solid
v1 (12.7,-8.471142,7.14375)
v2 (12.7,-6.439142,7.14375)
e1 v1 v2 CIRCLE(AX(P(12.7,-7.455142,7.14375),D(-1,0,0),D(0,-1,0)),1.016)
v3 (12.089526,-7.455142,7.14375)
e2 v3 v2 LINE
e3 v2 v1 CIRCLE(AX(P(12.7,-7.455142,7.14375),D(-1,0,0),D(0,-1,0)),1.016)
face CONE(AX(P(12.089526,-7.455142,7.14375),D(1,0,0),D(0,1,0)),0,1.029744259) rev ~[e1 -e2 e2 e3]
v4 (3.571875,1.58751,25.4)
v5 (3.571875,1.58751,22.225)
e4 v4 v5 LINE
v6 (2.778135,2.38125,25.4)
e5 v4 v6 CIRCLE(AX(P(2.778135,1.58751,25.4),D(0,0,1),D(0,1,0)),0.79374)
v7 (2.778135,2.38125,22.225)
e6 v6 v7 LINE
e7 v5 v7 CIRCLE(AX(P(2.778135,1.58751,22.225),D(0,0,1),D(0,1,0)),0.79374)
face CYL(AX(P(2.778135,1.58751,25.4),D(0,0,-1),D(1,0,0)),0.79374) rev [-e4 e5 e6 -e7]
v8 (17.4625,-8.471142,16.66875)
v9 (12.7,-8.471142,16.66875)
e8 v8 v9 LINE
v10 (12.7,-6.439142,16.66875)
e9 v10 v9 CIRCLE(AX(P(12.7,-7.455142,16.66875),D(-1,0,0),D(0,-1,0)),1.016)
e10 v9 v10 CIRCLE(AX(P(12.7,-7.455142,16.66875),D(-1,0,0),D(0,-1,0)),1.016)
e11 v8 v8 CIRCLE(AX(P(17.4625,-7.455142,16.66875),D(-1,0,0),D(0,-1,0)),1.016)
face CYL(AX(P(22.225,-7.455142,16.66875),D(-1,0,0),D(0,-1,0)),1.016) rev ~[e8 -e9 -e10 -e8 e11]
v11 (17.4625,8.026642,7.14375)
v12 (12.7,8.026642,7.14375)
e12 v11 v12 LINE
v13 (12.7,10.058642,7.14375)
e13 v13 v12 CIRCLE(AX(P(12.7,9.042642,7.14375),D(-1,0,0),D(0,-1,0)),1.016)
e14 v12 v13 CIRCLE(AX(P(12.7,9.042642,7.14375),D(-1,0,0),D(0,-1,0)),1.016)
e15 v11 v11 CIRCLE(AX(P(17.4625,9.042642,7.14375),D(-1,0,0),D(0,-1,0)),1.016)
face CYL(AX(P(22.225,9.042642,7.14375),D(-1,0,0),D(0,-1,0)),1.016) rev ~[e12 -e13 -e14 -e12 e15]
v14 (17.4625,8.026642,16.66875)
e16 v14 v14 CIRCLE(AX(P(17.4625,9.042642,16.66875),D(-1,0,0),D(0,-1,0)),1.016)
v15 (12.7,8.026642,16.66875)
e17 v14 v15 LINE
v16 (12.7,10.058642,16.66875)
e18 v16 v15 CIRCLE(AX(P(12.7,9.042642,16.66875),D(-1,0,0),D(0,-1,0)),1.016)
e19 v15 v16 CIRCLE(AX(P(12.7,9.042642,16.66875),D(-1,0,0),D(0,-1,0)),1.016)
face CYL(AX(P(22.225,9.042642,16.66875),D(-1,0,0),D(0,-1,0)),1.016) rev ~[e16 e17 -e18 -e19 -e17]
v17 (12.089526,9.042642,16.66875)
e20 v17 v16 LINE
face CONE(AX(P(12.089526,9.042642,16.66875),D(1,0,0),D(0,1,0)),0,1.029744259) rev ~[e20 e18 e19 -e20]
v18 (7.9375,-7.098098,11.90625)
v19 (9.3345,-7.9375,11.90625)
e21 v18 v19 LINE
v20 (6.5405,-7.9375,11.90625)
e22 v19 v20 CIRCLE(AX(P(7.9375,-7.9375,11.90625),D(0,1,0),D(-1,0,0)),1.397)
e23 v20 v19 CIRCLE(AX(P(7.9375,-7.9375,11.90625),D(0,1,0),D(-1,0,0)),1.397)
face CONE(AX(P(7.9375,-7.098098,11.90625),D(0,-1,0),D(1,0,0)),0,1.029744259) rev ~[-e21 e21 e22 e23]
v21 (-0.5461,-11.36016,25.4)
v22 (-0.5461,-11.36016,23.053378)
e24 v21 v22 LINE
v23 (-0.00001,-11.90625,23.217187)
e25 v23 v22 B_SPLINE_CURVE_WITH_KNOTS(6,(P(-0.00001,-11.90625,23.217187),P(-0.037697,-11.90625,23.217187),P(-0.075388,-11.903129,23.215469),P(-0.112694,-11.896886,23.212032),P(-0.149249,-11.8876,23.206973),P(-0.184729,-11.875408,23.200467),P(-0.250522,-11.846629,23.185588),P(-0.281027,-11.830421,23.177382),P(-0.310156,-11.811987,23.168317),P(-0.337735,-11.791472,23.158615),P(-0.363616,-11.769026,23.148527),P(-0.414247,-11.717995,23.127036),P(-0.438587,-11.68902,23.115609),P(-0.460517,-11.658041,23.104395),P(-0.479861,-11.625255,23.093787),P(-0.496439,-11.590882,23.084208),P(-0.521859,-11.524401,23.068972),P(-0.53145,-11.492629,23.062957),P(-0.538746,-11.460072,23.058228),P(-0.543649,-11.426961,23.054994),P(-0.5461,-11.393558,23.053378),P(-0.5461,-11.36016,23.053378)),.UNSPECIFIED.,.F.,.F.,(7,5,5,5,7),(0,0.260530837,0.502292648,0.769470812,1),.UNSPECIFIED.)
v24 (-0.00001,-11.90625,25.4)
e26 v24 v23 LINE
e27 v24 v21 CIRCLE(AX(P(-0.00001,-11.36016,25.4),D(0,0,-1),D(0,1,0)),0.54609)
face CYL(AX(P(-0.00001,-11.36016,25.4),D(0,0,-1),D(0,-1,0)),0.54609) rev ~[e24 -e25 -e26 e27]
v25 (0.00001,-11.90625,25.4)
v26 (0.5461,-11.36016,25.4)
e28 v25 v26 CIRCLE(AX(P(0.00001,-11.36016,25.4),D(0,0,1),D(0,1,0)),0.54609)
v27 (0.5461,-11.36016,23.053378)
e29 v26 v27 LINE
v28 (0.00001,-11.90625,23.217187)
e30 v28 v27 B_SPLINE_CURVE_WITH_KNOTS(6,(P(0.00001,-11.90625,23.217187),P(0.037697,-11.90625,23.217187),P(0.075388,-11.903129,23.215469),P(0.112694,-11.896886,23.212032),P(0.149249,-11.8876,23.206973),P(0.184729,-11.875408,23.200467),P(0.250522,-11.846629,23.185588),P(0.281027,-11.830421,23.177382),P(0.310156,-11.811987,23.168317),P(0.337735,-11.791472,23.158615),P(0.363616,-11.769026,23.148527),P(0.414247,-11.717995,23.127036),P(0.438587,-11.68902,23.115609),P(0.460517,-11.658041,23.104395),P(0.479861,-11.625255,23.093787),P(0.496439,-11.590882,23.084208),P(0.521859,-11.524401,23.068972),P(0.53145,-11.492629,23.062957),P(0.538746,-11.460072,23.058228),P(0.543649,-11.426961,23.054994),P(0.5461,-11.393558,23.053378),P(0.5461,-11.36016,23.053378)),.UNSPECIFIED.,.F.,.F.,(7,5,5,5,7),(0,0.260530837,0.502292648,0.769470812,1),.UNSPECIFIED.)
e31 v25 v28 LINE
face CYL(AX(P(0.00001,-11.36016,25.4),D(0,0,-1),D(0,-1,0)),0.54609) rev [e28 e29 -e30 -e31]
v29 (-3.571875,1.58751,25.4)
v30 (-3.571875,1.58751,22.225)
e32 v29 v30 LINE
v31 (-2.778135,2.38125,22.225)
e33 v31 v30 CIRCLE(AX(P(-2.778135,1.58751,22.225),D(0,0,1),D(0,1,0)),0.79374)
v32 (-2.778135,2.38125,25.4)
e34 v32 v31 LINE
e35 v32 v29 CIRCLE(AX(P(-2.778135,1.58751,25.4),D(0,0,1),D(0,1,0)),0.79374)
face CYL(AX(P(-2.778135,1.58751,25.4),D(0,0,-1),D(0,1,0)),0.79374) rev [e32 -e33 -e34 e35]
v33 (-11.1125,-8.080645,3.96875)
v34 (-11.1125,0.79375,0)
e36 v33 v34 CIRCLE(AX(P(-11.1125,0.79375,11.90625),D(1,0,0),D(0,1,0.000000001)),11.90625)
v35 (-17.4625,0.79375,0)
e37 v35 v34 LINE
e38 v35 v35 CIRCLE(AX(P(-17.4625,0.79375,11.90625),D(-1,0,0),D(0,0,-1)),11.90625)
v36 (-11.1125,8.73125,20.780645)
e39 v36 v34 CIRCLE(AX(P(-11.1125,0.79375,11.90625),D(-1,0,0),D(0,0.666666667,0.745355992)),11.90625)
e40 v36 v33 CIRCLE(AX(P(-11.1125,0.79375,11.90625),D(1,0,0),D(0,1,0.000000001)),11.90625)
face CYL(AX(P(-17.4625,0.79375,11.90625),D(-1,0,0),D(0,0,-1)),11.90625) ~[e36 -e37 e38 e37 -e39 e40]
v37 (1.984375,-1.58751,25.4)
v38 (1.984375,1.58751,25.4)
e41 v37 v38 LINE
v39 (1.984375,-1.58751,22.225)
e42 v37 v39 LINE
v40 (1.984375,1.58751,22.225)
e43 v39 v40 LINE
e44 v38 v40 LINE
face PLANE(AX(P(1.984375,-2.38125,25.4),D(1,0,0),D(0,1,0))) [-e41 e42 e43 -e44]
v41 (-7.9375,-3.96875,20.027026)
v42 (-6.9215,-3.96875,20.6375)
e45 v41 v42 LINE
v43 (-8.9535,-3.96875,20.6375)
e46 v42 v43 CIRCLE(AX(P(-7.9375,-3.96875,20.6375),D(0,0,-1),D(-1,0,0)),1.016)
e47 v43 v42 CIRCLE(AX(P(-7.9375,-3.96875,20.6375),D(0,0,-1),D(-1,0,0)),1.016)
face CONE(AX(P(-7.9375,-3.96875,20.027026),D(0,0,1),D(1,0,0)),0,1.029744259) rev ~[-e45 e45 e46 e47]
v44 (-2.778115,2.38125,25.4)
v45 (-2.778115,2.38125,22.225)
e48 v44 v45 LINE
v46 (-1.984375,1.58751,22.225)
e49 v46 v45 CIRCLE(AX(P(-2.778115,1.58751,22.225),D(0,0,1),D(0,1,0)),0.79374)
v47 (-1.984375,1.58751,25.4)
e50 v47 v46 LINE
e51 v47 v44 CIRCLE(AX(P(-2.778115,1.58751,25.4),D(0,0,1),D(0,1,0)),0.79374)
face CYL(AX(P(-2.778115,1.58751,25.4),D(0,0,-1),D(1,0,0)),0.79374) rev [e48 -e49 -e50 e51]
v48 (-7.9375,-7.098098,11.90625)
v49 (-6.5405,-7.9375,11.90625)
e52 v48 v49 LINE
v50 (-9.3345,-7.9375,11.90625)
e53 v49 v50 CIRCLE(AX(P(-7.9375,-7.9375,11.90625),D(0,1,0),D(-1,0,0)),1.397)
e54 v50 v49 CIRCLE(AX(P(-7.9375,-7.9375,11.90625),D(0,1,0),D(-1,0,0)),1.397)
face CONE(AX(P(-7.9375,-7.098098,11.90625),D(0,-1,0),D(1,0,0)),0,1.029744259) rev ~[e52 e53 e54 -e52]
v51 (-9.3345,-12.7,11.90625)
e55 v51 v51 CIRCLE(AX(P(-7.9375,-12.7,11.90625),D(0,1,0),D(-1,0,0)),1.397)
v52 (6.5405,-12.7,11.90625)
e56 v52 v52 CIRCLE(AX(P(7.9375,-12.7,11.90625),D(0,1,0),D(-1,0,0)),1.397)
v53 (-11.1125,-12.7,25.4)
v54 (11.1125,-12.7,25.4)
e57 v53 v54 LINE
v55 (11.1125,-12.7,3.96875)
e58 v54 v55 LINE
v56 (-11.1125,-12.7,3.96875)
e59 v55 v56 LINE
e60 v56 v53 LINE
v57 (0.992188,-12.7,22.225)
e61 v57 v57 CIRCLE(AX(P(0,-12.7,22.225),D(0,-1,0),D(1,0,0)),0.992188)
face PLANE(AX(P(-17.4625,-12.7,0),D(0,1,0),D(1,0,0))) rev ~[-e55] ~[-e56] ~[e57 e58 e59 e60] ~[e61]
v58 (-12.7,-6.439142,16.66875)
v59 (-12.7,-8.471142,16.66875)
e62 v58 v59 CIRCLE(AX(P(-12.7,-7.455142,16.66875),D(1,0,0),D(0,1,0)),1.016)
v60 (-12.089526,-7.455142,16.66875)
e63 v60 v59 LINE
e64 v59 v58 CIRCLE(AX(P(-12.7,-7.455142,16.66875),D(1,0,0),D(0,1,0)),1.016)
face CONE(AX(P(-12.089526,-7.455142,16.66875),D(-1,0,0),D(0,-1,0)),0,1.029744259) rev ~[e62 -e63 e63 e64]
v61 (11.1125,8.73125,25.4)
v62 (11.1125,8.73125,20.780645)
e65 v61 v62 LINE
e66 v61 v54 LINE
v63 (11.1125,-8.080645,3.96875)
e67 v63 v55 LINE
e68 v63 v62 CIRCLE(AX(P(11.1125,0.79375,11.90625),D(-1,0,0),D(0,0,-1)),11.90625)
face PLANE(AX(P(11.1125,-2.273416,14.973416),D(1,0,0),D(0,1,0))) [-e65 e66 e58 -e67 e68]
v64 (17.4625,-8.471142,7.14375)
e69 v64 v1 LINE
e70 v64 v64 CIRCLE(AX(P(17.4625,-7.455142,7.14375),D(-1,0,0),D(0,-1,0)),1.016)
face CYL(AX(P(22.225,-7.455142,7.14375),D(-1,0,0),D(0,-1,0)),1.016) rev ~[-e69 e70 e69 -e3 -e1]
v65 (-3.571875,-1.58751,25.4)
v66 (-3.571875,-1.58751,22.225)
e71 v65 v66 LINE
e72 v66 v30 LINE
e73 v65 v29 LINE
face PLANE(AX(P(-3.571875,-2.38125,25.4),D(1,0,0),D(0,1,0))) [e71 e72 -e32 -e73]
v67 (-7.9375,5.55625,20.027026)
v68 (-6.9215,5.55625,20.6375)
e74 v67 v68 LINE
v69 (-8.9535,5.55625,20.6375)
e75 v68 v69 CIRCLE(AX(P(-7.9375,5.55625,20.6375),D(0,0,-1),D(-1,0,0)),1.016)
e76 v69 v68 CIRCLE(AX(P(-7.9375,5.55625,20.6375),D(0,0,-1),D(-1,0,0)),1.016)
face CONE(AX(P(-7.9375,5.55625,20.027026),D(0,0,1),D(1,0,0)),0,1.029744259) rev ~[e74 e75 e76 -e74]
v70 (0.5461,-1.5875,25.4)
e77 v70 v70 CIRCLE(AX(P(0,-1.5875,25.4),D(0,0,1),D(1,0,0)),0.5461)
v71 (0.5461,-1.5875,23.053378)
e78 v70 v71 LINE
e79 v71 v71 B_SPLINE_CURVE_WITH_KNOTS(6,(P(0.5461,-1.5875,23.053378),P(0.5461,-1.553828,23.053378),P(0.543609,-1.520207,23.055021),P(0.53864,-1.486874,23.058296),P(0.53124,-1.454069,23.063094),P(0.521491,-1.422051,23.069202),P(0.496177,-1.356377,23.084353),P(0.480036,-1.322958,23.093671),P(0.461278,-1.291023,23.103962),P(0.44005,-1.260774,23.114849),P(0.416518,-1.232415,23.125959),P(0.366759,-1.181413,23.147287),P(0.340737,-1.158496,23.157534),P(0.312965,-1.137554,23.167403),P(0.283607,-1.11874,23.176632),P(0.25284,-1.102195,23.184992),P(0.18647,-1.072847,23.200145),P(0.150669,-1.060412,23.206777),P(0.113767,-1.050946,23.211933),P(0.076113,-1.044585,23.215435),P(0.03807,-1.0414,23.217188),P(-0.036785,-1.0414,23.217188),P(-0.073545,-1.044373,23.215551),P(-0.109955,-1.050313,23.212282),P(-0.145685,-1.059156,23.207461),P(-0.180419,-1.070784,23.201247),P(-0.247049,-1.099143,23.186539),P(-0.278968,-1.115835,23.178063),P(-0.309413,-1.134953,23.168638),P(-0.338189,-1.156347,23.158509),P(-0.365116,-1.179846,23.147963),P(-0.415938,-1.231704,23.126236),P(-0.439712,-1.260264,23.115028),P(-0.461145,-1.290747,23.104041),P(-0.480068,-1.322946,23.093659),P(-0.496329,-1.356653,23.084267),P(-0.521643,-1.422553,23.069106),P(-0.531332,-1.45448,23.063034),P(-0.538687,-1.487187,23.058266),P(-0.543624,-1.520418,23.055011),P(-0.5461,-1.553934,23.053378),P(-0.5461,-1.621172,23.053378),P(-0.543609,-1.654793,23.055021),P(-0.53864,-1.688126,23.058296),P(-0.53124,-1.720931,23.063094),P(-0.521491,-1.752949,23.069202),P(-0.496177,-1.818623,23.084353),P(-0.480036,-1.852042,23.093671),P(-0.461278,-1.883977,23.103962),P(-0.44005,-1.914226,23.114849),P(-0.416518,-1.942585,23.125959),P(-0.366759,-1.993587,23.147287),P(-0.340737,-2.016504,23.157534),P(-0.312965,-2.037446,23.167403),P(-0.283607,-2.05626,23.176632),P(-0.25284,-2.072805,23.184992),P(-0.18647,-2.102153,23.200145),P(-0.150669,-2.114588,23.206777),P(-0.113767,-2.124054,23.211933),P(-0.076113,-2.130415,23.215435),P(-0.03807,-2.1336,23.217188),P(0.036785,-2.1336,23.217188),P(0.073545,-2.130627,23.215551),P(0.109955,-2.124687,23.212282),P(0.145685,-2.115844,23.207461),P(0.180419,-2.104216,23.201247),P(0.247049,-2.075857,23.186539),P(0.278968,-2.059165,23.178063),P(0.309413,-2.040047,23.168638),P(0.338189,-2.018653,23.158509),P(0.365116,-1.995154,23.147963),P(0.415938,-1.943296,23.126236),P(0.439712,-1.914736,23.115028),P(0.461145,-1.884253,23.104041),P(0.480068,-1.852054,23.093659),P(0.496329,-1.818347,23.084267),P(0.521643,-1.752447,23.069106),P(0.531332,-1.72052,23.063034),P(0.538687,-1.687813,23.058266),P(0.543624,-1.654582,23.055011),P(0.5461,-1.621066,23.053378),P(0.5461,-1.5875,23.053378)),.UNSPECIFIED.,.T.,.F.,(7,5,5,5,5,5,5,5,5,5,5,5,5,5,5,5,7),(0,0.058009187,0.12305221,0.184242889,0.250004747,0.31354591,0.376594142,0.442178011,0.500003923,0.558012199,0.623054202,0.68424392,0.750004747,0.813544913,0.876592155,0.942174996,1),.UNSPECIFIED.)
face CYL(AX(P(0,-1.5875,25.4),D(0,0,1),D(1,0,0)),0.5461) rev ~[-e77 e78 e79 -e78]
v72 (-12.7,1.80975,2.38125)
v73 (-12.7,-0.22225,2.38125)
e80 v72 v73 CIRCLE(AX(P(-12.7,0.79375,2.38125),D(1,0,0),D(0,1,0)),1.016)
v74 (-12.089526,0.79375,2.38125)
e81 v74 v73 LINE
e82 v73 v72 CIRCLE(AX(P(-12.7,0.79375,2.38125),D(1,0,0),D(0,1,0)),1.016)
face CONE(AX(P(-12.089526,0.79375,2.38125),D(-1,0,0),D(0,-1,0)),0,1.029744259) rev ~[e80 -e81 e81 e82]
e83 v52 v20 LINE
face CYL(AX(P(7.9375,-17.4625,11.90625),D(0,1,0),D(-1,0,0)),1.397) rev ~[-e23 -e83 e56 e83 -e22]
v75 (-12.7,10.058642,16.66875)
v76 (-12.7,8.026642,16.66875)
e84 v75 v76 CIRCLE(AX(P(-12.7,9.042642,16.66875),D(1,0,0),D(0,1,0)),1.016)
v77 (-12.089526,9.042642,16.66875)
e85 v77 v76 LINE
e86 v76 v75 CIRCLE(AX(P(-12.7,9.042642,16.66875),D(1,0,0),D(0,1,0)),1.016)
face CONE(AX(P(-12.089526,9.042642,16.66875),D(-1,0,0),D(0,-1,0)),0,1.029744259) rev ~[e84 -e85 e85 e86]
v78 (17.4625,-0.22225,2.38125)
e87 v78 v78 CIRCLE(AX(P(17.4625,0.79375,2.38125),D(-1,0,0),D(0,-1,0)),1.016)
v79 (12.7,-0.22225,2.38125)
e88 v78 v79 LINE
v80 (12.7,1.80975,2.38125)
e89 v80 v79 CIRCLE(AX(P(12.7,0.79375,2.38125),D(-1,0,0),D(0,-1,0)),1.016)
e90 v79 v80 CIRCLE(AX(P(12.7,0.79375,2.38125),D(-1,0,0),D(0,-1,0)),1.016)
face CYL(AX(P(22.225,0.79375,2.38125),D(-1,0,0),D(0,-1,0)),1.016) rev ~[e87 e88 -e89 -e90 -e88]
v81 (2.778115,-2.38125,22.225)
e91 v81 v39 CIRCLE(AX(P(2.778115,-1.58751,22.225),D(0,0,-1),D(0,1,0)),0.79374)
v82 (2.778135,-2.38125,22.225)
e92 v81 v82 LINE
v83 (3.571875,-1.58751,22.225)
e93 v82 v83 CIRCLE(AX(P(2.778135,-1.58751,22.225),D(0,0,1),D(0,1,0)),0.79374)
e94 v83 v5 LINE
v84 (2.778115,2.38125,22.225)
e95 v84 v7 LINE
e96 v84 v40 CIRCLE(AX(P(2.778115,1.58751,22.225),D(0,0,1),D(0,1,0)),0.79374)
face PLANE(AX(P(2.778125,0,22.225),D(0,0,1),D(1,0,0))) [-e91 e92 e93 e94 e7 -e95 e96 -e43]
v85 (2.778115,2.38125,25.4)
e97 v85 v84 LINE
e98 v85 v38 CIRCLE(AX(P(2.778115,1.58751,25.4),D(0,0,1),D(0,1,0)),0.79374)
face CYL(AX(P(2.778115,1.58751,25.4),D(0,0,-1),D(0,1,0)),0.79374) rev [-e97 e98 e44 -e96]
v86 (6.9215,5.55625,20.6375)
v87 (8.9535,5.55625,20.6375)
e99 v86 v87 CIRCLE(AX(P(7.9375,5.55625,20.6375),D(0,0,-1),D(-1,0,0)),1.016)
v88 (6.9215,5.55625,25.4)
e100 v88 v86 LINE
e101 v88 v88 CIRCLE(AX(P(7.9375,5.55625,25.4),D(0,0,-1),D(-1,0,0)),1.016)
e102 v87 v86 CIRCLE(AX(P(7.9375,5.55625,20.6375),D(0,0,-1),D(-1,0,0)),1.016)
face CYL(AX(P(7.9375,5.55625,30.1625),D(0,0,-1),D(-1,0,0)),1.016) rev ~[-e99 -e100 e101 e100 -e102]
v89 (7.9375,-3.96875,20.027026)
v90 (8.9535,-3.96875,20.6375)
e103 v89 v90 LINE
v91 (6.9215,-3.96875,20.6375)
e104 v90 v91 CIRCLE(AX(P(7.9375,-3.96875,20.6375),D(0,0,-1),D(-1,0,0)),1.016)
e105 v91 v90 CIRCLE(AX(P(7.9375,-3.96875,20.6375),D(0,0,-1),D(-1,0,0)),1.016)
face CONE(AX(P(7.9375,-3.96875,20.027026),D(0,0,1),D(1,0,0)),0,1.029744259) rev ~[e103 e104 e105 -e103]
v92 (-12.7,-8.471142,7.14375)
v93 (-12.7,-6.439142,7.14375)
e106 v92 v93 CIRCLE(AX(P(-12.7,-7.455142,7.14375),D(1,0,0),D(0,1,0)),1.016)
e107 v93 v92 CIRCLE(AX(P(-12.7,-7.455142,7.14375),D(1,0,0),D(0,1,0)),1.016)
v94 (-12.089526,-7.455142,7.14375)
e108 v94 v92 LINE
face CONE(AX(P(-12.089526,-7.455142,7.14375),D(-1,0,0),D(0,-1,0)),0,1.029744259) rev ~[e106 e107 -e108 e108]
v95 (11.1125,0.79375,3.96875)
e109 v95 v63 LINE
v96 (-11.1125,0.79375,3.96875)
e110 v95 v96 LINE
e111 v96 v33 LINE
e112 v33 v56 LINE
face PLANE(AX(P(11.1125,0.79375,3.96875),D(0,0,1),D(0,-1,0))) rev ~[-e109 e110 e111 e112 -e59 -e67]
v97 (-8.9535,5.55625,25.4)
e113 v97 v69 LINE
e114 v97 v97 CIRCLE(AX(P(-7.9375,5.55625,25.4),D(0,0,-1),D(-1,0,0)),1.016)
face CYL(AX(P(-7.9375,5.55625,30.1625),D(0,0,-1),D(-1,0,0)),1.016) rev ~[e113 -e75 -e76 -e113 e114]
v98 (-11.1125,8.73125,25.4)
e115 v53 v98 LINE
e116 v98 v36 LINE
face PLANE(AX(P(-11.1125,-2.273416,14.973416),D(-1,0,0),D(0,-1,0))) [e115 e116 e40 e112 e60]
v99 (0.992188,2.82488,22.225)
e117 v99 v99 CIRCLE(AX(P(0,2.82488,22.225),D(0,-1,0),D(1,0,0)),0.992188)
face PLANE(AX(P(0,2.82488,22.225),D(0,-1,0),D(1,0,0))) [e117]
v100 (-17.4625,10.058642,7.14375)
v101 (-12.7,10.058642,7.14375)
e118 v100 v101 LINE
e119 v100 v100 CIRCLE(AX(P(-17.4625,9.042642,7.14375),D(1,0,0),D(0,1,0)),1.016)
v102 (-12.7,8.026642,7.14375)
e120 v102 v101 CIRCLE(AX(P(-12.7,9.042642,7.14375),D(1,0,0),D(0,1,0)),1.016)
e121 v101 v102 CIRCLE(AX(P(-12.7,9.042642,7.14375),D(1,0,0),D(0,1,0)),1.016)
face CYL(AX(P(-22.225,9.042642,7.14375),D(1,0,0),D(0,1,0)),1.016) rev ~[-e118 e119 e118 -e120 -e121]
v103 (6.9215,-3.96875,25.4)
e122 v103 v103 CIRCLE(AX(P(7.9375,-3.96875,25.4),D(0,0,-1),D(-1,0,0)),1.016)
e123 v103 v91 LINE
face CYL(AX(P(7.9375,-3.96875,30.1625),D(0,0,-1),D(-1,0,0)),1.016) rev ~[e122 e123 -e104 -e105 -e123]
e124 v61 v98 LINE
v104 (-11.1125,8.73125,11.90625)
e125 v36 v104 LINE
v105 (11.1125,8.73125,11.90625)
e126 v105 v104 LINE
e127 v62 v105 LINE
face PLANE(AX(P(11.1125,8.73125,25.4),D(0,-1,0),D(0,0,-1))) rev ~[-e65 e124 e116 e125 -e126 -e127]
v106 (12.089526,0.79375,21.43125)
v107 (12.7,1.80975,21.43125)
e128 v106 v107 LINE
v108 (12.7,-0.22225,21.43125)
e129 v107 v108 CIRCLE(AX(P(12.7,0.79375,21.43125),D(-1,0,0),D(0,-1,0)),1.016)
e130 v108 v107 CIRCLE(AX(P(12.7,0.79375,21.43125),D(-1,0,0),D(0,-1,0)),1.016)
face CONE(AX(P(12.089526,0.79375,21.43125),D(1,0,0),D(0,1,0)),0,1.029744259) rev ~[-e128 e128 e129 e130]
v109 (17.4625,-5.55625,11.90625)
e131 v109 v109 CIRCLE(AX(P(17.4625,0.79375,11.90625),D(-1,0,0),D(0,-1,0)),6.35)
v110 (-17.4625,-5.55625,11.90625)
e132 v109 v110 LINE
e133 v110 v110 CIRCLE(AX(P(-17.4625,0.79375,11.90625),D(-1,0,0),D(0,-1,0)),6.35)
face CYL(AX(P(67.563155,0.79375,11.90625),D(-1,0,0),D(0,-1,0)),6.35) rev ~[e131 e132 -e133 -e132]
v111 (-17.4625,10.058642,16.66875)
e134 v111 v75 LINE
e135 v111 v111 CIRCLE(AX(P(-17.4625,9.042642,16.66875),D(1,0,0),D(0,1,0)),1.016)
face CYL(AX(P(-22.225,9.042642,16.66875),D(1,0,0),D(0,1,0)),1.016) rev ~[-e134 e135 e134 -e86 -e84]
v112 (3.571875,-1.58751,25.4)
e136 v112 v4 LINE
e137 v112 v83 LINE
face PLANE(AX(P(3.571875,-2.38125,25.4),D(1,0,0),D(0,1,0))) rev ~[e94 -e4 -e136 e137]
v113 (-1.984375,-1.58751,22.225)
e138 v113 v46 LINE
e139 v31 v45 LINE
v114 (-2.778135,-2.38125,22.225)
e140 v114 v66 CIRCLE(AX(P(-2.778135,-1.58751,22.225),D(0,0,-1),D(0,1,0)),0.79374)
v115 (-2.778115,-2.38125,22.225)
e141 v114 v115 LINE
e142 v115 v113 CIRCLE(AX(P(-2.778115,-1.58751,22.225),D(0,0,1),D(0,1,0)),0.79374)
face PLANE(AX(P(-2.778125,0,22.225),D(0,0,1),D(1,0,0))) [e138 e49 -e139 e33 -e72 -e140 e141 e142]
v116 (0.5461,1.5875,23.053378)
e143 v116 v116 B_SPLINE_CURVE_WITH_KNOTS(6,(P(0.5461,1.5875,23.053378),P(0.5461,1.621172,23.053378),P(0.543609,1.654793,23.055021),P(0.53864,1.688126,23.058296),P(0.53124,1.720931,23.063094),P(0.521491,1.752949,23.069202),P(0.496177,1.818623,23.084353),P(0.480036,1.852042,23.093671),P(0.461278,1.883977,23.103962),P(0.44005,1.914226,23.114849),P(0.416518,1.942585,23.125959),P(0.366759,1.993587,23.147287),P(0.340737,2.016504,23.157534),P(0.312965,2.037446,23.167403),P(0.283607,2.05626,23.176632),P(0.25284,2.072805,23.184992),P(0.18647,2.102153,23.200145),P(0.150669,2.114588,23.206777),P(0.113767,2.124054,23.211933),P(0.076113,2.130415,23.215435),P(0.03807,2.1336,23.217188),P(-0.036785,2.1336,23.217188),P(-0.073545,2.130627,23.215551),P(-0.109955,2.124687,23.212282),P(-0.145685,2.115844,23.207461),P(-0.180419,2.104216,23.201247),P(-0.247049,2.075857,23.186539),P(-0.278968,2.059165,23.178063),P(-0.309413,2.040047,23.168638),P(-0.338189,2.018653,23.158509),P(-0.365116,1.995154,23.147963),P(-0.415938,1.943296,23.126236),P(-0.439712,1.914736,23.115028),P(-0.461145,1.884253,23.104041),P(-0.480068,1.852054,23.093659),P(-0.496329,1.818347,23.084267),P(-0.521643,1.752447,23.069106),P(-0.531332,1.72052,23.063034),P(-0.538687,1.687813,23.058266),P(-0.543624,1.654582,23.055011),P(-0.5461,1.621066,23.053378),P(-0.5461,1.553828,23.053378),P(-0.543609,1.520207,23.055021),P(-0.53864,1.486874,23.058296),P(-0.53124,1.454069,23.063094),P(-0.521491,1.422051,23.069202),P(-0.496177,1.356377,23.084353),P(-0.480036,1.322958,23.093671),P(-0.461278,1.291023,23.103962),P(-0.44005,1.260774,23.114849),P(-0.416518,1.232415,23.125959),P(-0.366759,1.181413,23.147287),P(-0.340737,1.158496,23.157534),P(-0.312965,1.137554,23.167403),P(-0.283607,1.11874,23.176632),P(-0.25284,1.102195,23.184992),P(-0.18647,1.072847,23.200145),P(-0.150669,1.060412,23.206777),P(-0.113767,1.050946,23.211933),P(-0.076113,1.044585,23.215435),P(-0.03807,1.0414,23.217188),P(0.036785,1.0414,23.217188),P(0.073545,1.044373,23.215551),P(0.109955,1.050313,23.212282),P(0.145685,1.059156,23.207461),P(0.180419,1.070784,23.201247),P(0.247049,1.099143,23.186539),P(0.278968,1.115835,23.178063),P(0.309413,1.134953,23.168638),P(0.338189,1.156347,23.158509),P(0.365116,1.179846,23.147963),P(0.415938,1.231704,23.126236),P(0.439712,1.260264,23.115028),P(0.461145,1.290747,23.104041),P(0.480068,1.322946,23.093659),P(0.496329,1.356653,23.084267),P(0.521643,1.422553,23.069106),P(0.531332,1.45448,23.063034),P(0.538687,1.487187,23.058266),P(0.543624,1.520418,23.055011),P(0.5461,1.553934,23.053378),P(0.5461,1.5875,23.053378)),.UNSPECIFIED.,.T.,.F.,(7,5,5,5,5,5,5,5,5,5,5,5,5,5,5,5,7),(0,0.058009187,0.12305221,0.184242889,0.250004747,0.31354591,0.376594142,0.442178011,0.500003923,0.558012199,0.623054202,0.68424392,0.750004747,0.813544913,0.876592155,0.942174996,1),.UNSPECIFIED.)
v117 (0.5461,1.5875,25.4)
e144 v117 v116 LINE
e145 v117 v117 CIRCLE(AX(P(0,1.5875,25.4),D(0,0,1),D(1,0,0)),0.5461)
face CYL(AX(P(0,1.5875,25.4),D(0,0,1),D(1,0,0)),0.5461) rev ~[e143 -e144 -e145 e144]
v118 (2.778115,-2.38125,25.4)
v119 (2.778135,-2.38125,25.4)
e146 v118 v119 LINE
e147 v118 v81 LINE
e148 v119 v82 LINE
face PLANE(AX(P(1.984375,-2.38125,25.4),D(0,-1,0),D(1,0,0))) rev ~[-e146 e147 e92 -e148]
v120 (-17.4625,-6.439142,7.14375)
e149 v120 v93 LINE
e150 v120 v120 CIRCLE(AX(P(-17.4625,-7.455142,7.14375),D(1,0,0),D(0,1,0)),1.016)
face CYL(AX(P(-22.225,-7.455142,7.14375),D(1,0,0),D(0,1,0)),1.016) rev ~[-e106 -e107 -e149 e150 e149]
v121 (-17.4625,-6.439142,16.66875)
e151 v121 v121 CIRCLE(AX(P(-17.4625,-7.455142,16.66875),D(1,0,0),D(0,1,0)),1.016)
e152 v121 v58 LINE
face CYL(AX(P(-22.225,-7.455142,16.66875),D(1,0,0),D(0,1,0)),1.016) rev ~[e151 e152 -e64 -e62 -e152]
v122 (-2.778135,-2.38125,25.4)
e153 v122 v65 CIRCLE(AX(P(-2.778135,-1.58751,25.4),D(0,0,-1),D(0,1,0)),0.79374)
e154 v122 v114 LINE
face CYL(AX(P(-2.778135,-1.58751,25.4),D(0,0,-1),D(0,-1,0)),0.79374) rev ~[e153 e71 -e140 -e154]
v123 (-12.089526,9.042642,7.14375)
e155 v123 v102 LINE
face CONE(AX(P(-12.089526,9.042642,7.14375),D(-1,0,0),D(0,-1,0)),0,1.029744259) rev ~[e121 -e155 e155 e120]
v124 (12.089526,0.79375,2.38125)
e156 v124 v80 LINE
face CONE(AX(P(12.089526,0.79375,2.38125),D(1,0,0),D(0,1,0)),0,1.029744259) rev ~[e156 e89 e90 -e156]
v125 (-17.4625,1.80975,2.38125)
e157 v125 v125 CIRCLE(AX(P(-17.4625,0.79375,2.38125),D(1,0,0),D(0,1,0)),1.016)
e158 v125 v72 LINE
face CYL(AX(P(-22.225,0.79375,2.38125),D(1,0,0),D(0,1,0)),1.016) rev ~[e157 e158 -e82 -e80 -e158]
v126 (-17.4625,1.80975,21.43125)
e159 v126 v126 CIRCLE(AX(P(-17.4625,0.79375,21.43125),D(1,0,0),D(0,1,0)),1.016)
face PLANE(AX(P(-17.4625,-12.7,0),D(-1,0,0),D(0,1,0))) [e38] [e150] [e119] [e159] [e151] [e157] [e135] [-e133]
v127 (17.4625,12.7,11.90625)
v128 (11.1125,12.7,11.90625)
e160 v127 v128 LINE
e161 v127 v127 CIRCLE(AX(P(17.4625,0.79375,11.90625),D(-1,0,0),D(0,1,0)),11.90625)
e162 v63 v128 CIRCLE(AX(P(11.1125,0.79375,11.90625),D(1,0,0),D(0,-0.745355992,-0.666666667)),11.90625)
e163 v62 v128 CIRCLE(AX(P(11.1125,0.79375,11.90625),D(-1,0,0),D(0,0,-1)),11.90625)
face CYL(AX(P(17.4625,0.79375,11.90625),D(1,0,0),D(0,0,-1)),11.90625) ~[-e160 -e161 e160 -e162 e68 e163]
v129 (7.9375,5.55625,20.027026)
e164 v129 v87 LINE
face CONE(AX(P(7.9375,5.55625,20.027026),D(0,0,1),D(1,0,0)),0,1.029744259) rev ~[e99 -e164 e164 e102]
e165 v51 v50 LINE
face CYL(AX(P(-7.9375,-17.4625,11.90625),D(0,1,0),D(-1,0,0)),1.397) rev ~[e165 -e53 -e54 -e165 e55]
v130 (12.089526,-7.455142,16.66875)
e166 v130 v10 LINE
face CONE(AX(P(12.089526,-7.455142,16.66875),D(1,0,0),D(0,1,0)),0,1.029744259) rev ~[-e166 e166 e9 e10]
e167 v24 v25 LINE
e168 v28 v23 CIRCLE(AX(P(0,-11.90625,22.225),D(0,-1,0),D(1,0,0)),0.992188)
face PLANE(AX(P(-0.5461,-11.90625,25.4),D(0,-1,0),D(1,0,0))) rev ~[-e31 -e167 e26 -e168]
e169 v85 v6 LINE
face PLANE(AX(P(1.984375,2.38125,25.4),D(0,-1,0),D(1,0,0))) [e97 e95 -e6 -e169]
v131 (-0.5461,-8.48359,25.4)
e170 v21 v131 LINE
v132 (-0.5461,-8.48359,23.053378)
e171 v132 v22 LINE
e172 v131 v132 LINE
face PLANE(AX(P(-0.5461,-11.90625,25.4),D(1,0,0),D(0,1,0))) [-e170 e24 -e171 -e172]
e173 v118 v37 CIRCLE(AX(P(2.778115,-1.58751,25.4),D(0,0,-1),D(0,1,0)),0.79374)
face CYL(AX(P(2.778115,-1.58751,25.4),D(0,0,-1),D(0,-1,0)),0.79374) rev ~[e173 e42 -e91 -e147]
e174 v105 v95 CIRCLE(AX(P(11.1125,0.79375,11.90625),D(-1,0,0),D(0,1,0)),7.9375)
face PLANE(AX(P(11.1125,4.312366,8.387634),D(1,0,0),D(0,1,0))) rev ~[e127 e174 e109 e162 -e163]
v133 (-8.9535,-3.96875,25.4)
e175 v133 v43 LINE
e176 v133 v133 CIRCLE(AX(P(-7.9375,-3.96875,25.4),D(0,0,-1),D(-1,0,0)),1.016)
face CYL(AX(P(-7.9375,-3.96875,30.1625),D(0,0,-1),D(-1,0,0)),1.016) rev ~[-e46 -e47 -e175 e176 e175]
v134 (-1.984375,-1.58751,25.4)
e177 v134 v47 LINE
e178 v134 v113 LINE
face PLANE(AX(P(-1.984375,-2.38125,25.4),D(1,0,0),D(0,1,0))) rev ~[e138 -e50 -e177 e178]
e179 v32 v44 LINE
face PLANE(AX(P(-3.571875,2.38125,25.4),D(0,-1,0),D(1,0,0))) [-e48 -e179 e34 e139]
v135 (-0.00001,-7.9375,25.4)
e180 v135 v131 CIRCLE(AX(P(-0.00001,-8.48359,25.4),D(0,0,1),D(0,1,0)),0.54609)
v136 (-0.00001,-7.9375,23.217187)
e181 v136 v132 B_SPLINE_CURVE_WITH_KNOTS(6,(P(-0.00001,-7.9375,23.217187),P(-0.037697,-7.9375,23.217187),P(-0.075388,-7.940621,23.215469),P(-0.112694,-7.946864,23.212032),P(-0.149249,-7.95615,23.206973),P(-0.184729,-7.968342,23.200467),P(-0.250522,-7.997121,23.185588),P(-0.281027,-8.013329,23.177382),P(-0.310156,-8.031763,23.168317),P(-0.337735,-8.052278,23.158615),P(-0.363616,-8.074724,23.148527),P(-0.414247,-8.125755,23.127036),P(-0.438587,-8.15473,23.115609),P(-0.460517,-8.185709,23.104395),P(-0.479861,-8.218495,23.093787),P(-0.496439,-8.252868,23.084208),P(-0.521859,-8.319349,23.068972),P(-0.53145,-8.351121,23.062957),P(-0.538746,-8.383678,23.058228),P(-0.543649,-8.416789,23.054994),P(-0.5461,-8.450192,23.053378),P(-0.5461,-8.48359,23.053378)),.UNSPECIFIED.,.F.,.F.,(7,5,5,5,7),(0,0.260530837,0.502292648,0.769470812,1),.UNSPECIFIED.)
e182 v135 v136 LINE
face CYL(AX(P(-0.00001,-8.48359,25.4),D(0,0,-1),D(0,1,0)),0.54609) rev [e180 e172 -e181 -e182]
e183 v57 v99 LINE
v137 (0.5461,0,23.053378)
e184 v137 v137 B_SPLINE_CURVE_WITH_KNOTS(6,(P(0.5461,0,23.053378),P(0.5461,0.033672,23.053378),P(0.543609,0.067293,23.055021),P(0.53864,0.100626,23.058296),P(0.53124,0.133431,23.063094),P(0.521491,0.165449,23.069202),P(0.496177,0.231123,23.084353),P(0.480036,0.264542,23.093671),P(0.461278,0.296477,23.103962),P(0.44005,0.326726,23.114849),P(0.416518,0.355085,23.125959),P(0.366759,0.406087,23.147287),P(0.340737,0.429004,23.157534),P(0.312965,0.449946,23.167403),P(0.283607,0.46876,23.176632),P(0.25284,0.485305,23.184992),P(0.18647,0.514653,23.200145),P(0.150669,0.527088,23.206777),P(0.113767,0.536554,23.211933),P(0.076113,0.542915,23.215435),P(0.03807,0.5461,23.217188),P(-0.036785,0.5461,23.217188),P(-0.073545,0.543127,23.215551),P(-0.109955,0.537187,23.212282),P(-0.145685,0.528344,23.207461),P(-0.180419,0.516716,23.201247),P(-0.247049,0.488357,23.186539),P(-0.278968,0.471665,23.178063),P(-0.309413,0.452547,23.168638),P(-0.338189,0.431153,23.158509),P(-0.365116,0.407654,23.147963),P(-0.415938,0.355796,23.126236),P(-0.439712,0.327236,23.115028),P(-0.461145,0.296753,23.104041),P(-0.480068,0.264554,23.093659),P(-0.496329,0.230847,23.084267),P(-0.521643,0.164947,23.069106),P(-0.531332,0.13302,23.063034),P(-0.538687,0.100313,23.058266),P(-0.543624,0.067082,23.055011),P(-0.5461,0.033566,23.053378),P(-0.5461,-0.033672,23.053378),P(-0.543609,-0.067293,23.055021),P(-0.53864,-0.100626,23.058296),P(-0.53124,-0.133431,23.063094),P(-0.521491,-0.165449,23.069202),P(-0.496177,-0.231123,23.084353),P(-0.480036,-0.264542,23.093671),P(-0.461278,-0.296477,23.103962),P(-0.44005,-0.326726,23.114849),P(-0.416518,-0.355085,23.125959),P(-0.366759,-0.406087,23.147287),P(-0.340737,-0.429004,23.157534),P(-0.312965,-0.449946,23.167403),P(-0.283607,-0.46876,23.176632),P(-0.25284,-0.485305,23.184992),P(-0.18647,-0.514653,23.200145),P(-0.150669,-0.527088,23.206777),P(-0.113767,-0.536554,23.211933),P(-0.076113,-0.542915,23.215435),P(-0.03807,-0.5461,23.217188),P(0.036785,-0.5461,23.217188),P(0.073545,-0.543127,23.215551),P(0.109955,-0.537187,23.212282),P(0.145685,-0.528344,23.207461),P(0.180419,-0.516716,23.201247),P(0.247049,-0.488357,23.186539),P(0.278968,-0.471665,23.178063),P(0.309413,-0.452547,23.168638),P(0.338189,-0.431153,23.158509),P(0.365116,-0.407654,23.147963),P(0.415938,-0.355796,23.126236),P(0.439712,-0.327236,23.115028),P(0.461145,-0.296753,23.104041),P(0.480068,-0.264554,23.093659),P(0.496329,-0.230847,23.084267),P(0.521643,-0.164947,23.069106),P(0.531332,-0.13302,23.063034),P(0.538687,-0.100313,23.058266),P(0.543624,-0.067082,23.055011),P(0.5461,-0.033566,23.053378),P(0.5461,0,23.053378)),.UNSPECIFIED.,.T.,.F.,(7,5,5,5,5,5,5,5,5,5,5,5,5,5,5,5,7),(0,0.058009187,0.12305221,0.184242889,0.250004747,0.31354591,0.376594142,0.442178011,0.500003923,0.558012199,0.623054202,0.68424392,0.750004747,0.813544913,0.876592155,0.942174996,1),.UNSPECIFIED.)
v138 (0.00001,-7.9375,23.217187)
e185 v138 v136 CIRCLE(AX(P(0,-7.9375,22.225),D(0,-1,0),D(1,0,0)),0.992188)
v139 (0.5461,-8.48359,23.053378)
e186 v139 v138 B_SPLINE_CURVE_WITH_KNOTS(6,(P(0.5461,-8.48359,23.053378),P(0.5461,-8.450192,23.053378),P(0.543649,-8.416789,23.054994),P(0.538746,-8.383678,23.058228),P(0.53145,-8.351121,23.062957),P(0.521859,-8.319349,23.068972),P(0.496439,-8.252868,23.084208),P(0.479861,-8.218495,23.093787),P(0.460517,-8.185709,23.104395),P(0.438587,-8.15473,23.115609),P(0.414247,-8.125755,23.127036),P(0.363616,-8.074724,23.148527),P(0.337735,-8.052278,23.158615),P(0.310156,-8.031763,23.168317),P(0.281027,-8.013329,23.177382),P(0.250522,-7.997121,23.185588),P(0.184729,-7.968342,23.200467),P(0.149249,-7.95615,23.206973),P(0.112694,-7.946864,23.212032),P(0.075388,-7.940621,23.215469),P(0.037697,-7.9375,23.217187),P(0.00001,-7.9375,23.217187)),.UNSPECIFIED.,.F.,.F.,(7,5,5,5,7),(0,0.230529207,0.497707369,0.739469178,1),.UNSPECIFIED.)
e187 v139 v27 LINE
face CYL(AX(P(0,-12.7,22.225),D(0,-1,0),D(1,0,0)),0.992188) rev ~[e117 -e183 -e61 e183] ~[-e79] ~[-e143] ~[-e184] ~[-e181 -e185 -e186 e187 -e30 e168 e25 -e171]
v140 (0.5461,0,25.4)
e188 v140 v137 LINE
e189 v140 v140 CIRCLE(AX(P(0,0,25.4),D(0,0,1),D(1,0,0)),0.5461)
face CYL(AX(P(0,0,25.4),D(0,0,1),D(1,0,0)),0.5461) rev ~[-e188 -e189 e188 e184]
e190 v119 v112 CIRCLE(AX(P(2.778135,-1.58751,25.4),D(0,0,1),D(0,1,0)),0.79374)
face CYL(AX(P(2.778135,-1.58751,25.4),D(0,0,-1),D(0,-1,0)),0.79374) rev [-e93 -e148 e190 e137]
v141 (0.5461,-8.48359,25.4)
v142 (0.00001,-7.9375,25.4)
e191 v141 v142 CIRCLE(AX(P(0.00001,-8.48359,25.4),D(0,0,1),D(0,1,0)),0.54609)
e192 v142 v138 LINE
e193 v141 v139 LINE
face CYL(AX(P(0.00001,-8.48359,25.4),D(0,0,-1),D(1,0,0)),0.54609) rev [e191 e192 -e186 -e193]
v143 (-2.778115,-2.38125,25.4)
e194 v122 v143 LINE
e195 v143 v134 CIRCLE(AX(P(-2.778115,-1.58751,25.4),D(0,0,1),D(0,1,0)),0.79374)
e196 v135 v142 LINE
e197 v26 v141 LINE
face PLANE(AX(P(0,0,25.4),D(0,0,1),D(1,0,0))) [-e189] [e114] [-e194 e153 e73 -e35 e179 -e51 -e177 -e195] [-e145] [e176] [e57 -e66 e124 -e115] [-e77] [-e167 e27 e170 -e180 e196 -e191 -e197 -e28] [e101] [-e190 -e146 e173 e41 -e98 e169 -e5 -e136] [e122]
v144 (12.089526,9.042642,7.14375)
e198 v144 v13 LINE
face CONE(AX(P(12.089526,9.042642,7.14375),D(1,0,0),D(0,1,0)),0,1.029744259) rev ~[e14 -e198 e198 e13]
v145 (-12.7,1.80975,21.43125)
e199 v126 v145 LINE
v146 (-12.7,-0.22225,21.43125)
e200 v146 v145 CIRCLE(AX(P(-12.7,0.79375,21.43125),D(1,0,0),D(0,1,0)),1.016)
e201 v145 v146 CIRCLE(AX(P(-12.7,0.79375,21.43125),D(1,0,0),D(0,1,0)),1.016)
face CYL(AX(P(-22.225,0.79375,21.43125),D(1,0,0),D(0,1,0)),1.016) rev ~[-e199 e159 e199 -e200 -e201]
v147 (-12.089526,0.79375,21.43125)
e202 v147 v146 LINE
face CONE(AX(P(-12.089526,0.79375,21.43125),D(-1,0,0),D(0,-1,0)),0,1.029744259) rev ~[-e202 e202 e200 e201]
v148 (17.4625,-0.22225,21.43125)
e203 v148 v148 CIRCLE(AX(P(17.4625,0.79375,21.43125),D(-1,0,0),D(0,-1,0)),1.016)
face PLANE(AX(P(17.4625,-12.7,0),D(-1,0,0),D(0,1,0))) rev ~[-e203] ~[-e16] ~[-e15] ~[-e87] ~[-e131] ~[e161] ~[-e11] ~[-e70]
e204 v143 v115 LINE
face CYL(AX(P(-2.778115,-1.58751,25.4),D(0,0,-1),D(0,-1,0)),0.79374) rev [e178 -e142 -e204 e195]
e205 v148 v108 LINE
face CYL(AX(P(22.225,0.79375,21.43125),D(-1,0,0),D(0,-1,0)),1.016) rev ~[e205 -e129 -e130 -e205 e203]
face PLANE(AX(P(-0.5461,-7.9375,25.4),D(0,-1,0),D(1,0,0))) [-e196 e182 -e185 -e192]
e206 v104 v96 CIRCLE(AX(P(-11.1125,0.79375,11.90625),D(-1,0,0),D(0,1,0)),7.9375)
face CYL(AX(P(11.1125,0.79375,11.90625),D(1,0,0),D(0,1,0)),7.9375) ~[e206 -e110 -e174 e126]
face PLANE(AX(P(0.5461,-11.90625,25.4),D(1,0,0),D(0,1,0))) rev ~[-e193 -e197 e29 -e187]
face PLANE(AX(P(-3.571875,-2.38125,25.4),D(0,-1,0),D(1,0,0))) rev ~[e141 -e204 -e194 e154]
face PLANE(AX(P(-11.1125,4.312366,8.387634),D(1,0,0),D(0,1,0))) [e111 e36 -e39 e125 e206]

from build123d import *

# Parameters (mm, degrees)
F0_W             = 34.925
F0_H             = 25.4
F1_DEPTH         = 25.4
F3_DEPTH         = 6.35
F5_DEPTH         = 6.35
F6_D             = 12.7
F9_DEPTH         = 22.225
F11_D            = 2.794
F11_DEPTH        = 4.7625
F11_TIP          = 0.8394022848
F13_D            = 2.032
F13_DEPTH        = 4.7625
F13_TIP          = 0.6104743889
F16_D            = 2.032
F16_DEPTH        = 4.7625
F16_TIP          = 0.6104743889
F16_ON_F15_D     = 2.032
F16_ON_F15_DEPTH = 4.7625
F16_ON_F15_TIP   = 0.6104743889
F17_W            = 1.5875
F17_H            = 4.7625
F18_DEPTH        = 3.175
F19_R            = 0.79374
F20_R            = 0.9921875
F21_DEPTH        = 15.52488
F22_R            = 0.5461
F22_W            = 1.0922
F22_H            = 3.96875
F23_DEPTH        = 3.175
F24_R            = 0.54609


# Not quite as in the source:
# - a fillet or chamfer is up to 0.001 mm smaller than in the source, because OpenCascade refuses the exact size


with BuildPart() as f1:
    # F0 (on Top) → F1 (new body)
    with BuildSketch(Plane.XY):
        Rectangle(F0_W, F0_H)
    extrude(amount=F1_DEPTH)

    # F2 (on face) → F3 (cut)
    with BuildSketch(Plane.YZ.offset(17.4625)):
        with BuildLine():
            Line((-12.7, 25.4), (-12.7, 0))
            Line((-12.7, 0), (0.79375, 0))
            ThreePointArc((0.79375, 0), (-7.6252401135, 20.3252401135), (12.7, 11.90625))
            Line((12.7, 11.90625), (12.7, 25.4))
            Line((12.7, 25.4), (-12.7, 25.4))
        make_face()
        with BuildLine():
            ThreePointArc((12.7, 11.90625), (9.2127401135, 3.4872598865), (0.79375, 0))
            Line((0.79375, 0), (12.7, 0))
            Line((12.7, 0), (12.7, 11.90625))
        make_face()
    extrude(amount=-F3_DEPTH, mode=Mode.SUBTRACT)

    # F4 (on face) → F5 (cut)
    with BuildSketch(Plane(origin=(-17.4625, 0, 0), x_dir=(0, -1, 0), z_dir=(-1, 0, 0))):
        with BuildLine():
            ThreePointArc((11.1125, 11.90625), (7.6252401135, 3.4872598865), (-0.79375, 0))
            Line((-0.79375, 0), (12.7, 0))
            Line((12.7, 0), (12.7, 25.4))
            Line((12.7, 25.4), (-12.7, 25.4))
            Line((-12.7, 25.4), (-12.7, 11.9062500146))
            ThreePointArc((-12.7, 11.9062500146), (-0.7937499927, 23.8125), (11.1125, 11.90625))
        make_face()
        with BuildLine():
            Line((-12.7, 11.9062500146), (-12.7, 0))
            Line((-12.7, 0), (-0.79375, 0))
            ThreePointArc((-0.79375, 0), (-9.2127401186, 3.4872598916), (-12.7, 11.9062500146))
        make_face()
    extrude(amount=-F5_DEPTH, mode=Mode.SUBTRACT)

    # F6 (through all)
    with Locations(Plane.YZ.offset(17.4625)):
        with Locations((0.79375, 11.90625)):
            Hole(F6_D / 2)

    # F8 (on offset) → F9 (cut)
    with BuildSketch(Plane.YZ.offset(11.1125)):
        with BuildLine():
            Line((-12.7, 3.96875), (-12.7, 0))
            Line((-12.7, 0), (12.7, 0))
            Line((12.7, 0), (12.7, 25.4))
            Line((12.7, 25.4), (8.73125, 25.4))
            Line((8.73125, 25.4), (8.73125, 11.90625))
            ThreePointArc((8.73125, 11.90625), (6.4064100757, 6.2935899243), (0.79375, 3.96875))
            Line((0.79375, 3.96875), (-12.7, 3.96875))
        make_face()
    extrude(amount=-F9_DEPTH, mode=Mode.SUBTRACT)

    # F11
    with Locations(Plane.XZ.offset(12.7)):
        with Locations((-7.9375, 11.90625), (7.9375, 11.90625)):
            Hole(F11_D / 2, depth=F11_DEPTH)
            with Locations((0, 0, -(F11_DEPTH + F11_TIP / 2))):  # 118° drill point
                Cone(0, F11_D / 2, F11_TIP, mode=Mode.SUBTRACT)

    # F13
    with Locations(Plane.XY.offset(25.4)):
        with Locations((-7.9375, 5.55625), (7.9375, 5.55625), (7.9375, -3.96875), (-7.9375, -3.96875)):
            Hole(F13_D / 2, depth=F13_DEPTH)
            with Locations((0, 0, -(F13_DEPTH + F13_TIP / 2))):  # 118° drill point
                Cone(0, F13_D / 2, F13_TIP, mode=Mode.SUBTRACT)

    # F16
    with Locations(Plane.YZ.offset(17.4625)):
        with Locations((0.79375, 21.43125), (9.0426419749, 16.6687499934), (9.0426419634, 7.1437499867), (0.793749977, 2.38125), (-7.4551419864, 7.1437500265), (-7.4551419519, 16.6687500331)):
            Hole(F16_D / 2, depth=F16_DEPTH)
            with Locations((0, 0, -(F16_DEPTH + F16_TIP / 2))):  # 118° drill point
                Cone(0, F16_D / 2, F16_TIP, mode=Mode.SUBTRACT)

    # F16 on F15
    with Locations(Plane(origin=(-17.4625, 0, 0), x_dir=(0, -1, 0), z_dir=(-1, 0, 0))):
        with Locations((-0.79375, 21.43125), (-9.042641971, 16.66875), (-9.042641971, 7.14375), (-0.79375, 2.38125), (7.455141971, 7.14375), (7.455141971, 16.66875)):
            Hole(F16_ON_F15_D / 2, depth=F16_ON_F15_DEPTH)
            with Locations((0, 0, -(F16_ON_F15_DEPTH + F16_ON_F15_TIP / 2))):  # 118° drill point
                Cone(0, F16_ON_F15_D / 2, F16_ON_F15_TIP, mode=Mode.SUBTRACT)

    # F17 (on face) → F18 (cut)
    with BuildSketch(Plane.XY.offset(25.4)):
        with Locations((2.778125, 0)):
            Rectangle(F17_W, F17_H)
        with Locations((-2.778125, 0)):
            Rectangle(F17_W, F17_H)
    extrude(amount=-F18_DEPTH, mode=Mode.SUBTRACT)

    # F19 (radius 0.79375 in the source; OpenCascade refuses exactly that, so slightly less here)
    f19_edges = [f1.edges().sort_by_distance(p)[0] for p in [
        (-3.571875, 2.38125, 23.8125),
        (-1.984375, 2.38125, 23.8125),
        (-1.984375, -2.38125, 23.8125),
        (-3.571875, -2.38125, 23.8125),
        (1.984375, -2.38125, 23.8125),
        (3.571875, 2.38125, 23.8125),
        (1.984375, 2.38125, 23.8125),
        (3.571875, -2.38125, 23.8125),
    ]]
    fillet(f19_edges, radius=F19_R)

    # F20 (on face) → F21 (cut)
    with BuildSketch(Plane.XZ.offset(12.7)):
        with Locations((0, 22.225)):
            Circle(F20_R)
    extrude(amount=-F21_DEPTH, mode=Mode.SUBTRACT)

    # F22 (on face) → F23 (cut)
    with BuildSketch(Plane.XY.offset(25.4)):
        Circle(F22_R)
        with Locations((0, 1.5875)):
            Circle(F22_R)
        with Locations((0, -1.5875)):
            Circle(F22_R)
        with Locations((0, -9.921875)):
            Rectangle(F22_W, F22_H)
    extrude(amount=-F23_DEPTH, mode=Mode.SUBTRACT)

    # F24 (radius 0.5461 in the source; OpenCascade refuses exactly that, so slightly less here)
    f24_edges = [f1.edges().sort_by_distance(p)[0] for p in [
        (-0.5461, -7.9375, 24.226689),
        (0.5461, -7.9375, 24.226689),
        (0.5461, -11.90625, 24.226689),
        (-0.5461, -11.90625, 24.226689),
    ]]
    fillet(f24_edges, radius=F24_R)


solid = f1.part
